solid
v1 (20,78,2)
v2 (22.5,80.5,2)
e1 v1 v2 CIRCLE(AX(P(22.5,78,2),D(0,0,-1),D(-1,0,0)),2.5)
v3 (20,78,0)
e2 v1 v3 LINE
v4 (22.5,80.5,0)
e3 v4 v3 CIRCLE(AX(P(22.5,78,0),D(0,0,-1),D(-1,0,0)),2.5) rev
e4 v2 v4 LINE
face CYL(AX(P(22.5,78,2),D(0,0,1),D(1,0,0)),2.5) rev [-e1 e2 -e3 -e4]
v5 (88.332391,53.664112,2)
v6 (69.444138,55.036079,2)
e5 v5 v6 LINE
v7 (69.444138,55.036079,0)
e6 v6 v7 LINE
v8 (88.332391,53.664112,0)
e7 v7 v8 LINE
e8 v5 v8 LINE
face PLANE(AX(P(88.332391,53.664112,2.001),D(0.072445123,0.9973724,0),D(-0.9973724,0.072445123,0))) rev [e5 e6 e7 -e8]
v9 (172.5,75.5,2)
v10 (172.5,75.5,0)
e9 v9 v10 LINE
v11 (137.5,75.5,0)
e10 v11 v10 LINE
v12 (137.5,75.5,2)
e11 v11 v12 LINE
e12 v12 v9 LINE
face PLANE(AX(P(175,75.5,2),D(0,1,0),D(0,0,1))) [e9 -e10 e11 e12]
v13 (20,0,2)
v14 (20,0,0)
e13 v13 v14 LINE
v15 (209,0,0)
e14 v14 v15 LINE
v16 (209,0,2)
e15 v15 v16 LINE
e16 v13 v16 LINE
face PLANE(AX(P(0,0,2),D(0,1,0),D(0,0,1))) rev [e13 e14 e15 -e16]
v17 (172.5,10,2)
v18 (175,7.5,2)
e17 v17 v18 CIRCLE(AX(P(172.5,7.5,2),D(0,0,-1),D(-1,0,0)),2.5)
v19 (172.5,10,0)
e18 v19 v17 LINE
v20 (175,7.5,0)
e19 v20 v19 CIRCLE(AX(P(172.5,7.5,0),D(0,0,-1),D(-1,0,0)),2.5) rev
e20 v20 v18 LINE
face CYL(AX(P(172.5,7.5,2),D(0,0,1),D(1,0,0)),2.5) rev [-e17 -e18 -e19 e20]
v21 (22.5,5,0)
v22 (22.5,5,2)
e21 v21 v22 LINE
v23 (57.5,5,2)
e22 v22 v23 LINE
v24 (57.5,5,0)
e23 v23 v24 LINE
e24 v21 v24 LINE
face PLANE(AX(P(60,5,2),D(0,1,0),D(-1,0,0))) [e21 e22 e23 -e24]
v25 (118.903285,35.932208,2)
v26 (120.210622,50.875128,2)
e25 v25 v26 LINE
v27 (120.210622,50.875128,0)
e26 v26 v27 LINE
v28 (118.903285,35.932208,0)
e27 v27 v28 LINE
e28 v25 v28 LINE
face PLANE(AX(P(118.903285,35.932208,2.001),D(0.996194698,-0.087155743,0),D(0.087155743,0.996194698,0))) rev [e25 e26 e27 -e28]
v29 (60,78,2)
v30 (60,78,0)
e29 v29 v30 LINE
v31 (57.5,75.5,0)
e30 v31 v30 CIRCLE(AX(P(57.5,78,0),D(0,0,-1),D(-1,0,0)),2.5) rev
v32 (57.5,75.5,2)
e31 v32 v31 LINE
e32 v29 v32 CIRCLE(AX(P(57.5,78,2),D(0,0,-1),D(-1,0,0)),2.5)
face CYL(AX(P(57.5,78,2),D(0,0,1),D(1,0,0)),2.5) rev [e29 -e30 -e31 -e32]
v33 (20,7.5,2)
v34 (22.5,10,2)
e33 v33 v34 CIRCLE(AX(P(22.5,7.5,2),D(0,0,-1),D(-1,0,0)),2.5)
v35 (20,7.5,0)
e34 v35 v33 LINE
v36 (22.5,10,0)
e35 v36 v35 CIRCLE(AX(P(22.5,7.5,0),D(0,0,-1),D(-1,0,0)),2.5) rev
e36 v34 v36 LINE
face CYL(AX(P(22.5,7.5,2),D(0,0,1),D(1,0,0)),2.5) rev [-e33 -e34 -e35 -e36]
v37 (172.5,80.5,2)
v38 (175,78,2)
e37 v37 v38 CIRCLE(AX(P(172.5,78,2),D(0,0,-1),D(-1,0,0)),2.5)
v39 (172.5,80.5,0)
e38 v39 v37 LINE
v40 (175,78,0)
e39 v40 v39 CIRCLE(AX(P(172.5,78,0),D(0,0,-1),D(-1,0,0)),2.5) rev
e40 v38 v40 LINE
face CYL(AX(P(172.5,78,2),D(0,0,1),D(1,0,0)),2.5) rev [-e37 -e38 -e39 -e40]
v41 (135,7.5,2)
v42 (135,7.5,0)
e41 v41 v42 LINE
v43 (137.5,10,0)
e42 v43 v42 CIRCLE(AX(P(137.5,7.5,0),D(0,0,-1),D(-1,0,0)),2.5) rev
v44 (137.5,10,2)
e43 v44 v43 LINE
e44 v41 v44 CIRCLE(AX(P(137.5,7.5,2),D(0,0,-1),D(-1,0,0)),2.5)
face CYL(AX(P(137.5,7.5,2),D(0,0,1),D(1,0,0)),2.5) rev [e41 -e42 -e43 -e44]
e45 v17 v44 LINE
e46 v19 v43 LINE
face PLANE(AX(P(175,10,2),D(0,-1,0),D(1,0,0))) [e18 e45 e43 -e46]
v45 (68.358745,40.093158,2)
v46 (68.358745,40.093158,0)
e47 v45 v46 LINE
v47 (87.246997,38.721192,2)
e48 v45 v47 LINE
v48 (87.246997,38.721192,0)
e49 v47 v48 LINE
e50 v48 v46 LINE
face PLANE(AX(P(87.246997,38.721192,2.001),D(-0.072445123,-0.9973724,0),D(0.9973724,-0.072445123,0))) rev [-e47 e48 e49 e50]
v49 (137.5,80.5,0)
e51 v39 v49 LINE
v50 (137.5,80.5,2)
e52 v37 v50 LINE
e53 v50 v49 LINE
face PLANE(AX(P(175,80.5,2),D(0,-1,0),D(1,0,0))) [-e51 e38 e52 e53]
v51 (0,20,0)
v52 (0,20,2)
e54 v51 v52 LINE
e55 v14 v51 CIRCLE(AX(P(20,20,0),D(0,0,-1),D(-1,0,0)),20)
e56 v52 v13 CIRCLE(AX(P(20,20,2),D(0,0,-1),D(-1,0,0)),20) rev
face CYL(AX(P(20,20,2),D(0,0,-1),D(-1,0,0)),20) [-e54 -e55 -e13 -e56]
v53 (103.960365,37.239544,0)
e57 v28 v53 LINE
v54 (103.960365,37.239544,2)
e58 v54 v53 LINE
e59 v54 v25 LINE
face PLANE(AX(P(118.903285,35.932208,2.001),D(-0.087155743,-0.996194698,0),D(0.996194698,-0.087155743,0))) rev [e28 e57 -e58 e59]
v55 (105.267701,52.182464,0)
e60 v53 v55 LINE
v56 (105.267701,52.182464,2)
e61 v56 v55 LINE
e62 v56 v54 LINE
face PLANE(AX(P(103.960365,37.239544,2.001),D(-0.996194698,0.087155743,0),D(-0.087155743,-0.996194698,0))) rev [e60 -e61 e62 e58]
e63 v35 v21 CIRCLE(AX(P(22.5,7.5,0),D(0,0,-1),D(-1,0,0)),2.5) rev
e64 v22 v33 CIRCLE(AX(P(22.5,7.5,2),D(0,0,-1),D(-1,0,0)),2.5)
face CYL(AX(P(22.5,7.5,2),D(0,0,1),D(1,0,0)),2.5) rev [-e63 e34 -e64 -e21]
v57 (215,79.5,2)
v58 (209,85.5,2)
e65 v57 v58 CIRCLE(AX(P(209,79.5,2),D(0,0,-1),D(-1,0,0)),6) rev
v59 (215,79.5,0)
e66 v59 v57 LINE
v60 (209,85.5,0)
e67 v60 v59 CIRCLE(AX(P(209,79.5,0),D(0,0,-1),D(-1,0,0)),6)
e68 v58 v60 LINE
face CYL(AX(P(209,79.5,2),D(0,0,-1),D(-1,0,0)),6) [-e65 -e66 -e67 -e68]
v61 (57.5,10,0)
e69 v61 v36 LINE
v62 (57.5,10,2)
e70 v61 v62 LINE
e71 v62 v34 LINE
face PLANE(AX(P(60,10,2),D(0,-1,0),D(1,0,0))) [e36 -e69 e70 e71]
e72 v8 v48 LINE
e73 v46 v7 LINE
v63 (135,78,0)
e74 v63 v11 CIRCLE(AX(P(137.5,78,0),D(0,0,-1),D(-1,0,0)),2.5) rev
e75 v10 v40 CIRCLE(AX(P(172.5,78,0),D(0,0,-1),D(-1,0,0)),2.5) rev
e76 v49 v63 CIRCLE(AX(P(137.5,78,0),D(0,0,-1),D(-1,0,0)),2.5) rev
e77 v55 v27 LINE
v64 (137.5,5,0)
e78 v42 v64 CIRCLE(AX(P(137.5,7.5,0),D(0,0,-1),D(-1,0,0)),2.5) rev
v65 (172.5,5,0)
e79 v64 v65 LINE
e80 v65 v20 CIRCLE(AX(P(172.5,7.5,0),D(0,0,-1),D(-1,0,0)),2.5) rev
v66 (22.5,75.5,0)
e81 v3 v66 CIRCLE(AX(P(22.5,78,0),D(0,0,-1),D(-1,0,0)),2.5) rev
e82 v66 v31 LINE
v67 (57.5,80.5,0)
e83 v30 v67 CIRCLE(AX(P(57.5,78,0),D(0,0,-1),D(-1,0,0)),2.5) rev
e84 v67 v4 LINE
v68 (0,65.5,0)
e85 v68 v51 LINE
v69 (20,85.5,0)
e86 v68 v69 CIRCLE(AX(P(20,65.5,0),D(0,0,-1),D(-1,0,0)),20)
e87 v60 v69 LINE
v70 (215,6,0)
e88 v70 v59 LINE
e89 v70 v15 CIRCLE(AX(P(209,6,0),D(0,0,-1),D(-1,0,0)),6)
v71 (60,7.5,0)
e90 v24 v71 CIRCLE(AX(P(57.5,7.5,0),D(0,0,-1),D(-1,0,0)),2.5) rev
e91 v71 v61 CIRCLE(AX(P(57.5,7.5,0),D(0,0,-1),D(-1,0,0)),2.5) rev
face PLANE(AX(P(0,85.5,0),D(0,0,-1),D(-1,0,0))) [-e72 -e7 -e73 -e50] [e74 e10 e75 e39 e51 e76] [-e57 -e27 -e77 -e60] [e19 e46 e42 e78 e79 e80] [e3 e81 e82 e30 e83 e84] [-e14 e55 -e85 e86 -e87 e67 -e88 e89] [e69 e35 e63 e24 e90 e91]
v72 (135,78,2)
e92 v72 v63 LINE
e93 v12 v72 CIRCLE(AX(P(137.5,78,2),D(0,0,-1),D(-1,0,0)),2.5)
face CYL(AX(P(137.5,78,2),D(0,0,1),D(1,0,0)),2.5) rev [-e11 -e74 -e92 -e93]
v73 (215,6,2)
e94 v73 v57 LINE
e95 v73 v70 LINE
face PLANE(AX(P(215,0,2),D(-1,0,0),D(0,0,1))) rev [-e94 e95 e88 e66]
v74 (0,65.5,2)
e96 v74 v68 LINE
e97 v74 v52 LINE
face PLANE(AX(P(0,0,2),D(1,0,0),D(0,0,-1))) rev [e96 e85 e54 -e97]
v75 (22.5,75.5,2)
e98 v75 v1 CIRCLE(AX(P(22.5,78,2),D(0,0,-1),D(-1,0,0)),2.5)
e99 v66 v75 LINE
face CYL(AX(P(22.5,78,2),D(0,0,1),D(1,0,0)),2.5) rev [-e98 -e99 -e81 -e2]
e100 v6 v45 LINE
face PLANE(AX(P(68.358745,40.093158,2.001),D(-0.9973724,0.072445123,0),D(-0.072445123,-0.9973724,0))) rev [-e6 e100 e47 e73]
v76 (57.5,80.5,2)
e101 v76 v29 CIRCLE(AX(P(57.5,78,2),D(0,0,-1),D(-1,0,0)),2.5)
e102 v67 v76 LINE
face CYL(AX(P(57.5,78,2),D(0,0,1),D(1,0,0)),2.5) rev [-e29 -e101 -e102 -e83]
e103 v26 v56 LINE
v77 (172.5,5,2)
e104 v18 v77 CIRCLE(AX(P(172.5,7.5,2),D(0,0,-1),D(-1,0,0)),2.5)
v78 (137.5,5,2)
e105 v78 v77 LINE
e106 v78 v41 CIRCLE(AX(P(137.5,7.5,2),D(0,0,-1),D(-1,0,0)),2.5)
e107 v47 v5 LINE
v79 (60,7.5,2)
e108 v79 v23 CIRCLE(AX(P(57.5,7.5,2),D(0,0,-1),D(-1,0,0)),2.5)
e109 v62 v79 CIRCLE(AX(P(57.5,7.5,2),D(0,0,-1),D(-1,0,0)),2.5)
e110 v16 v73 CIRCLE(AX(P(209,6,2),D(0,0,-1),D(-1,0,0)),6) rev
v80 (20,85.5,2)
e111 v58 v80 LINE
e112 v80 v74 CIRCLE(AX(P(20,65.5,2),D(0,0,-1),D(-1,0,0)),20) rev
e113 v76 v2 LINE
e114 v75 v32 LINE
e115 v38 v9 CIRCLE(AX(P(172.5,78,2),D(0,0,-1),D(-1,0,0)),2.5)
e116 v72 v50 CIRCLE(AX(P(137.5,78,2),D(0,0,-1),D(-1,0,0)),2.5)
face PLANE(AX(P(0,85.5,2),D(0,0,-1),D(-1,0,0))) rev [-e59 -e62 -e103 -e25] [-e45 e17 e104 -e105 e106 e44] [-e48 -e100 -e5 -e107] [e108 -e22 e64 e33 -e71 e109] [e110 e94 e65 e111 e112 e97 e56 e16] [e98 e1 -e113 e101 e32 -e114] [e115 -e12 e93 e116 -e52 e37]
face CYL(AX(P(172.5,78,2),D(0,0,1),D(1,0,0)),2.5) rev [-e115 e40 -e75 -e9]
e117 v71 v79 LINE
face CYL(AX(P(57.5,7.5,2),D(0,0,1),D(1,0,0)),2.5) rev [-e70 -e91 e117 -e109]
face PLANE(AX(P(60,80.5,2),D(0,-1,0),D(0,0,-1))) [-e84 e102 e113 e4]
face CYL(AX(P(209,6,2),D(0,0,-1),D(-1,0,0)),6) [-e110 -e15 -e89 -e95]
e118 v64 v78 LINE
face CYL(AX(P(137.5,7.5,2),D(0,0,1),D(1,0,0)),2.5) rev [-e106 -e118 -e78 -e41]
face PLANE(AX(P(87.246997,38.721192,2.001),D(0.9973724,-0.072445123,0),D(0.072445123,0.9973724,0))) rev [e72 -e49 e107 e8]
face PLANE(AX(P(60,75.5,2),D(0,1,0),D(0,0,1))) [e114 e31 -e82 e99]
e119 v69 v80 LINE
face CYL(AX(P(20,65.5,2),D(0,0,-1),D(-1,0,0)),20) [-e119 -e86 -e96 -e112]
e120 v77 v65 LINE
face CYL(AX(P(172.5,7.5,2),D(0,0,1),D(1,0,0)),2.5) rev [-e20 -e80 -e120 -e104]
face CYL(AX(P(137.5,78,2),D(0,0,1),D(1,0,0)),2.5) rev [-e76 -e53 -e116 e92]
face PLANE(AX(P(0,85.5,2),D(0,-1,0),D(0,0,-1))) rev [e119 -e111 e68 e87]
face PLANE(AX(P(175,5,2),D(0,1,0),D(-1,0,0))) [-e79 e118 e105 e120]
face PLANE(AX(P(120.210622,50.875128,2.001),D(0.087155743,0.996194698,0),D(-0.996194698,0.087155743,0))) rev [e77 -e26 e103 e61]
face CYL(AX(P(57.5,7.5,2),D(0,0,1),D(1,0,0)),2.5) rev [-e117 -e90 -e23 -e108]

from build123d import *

# Parameters (mm, degrees)
ESQUISSE1_W             = 215
ESQUISSE1_H             = 85.5
ESQUISSE1_W_2           = 40
ESQUISSE1_H_2           = 5
BOSS_EXTRU_1_DEPTH      = 2
CONG_1_R                = 6
CONG_2_R                = 20
CONG_3_R                = 2.5
ENL_V_MAT_EXTRU_1_REACH = 233.386


with BuildPart() as part:
    # Esquisse1 → Boss.-Extru.1 (new body)
    with BuildSketch(Plane.XY):
        with Locations((107.5, 42.75)):
            Rectangle(ESQUISSE1_W, ESQUISSE1_H)
        with Locations((155, 7.5)):
            Rectangle(ESQUISSE1_W_2, ESQUISSE1_H_2, mode=Mode.SUBTRACT)
        with Locations((155, 78)):
            Rectangle(ESQUISSE1_W_2, ESQUISSE1_H_2, mode=Mode.SUBTRACT)
        with Locations((40, 7.5)):
            Rectangle(ESQUISSE1_W_2, ESQUISSE1_H_2, mode=Mode.SUBTRACT)
        with Locations((40, 78)):
            Rectangle(ESQUISSE1_W_2, ESQUISSE1_H_2, mode=Mode.SUBTRACT)
    extrude(amount=BOSS_EXTRU_1_DEPTH)

    # Congé1
    cong_1_edges = [part.edges().sort_by_distance(p)[0] for p in [
        (215, 85.5, 1),
        (215, 0, 1),
    ]]
    fillet(cong_1_edges, radius=CONG_1_R)

    # Congé2
    cong_2_edges = [part.edges().sort_by_distance(p)[0] for p in [
        (0, 85.5, 1),
        (0, 0, 1),
    ]]
    fillet(cong_2_edges, radius=CONG_2_R)

    # Congé3
    cong_3_edges = [part.edges().sort_by_distance(p)[0] for p in [
        (20, 80.5, 1),
        (20, 75.5, 1),
        (60, 75.5, 1),
        (60, 80.5, 1),
        (60, 10, 1),
        (60, 5, 1),
        (20, 5, 1),
        (20, 10, 1),
        (135, 10, 1),
        (135, 5, 1),
        (175, 10, 1),
        (175, 5, 1),
        (135, 80.5, 1),
        (135, 75.5, 1),
        (175, 75.5, 1),
        (175, 80.5, 1),
    ]]
    fillet(cong_3_edges, radius=CONG_3_R - 0.0001)  # a hair under: the kernel refuses the full size

    # Esquisse2 → Enlèv. mat.-Extru.1 (cut, up to next)
    with BuildSketch(Plane(origin=(0, 0, 0), x_dir=(-1, 0, 0), z_dir=(0, 0, -1)), mode=Mode.PRIVATE) as enl_v_mat_extru_1_sk1:
        Polygon((-87.246997481, 38.721191603), (-88.332391174, 53.664112074), (-69.444138278, 55.03607886), (-68.358744585, 40.093158389), align=None)
    enl_v_mat_extru_1_tool1 = extrude(enl_v_mat_extru_1_sk1.sketch, amount=-ENL_V_MAT_EXTRU_1_REACH, mode=Mode.PRIVATE) & part.part
    # Esquisse2 → Enlèv. mat.-Extru.1 (cut, up to next)
    with BuildSketch(Plane(origin=(0, 0, 0), x_dir=(-1, 0, 0), z_dir=(0, 0, -1)), mode=Mode.PRIVATE) as enl_v_mat_extru_1_sk2:
        Polygon((-118.903285372, 35.932207835), (-120.210621513, 50.875128306), (-105.267701042, 52.182464448), (-103.9603649, 37.239543976), align=None)
    enl_v_mat_extru_1_tool2 = extrude(enl_v_mat_extru_1_sk2.sketch, amount=-ENL_V_MAT_EXTRU_1_REACH, mode=Mode.PRIVATE) & part.part
    add(enl_v_mat_extru_1_tool1.solids().sort_by_distance((78.345568, 46.878635, 0))[0], mode=Mode.SUBTRACT)
    add(enl_v_mat_extru_1_tool2.solids().sort_by_distance((112.085493, 44.057336, 0))[0], mode=Mode.SUBTRACT)


solid = part.part
